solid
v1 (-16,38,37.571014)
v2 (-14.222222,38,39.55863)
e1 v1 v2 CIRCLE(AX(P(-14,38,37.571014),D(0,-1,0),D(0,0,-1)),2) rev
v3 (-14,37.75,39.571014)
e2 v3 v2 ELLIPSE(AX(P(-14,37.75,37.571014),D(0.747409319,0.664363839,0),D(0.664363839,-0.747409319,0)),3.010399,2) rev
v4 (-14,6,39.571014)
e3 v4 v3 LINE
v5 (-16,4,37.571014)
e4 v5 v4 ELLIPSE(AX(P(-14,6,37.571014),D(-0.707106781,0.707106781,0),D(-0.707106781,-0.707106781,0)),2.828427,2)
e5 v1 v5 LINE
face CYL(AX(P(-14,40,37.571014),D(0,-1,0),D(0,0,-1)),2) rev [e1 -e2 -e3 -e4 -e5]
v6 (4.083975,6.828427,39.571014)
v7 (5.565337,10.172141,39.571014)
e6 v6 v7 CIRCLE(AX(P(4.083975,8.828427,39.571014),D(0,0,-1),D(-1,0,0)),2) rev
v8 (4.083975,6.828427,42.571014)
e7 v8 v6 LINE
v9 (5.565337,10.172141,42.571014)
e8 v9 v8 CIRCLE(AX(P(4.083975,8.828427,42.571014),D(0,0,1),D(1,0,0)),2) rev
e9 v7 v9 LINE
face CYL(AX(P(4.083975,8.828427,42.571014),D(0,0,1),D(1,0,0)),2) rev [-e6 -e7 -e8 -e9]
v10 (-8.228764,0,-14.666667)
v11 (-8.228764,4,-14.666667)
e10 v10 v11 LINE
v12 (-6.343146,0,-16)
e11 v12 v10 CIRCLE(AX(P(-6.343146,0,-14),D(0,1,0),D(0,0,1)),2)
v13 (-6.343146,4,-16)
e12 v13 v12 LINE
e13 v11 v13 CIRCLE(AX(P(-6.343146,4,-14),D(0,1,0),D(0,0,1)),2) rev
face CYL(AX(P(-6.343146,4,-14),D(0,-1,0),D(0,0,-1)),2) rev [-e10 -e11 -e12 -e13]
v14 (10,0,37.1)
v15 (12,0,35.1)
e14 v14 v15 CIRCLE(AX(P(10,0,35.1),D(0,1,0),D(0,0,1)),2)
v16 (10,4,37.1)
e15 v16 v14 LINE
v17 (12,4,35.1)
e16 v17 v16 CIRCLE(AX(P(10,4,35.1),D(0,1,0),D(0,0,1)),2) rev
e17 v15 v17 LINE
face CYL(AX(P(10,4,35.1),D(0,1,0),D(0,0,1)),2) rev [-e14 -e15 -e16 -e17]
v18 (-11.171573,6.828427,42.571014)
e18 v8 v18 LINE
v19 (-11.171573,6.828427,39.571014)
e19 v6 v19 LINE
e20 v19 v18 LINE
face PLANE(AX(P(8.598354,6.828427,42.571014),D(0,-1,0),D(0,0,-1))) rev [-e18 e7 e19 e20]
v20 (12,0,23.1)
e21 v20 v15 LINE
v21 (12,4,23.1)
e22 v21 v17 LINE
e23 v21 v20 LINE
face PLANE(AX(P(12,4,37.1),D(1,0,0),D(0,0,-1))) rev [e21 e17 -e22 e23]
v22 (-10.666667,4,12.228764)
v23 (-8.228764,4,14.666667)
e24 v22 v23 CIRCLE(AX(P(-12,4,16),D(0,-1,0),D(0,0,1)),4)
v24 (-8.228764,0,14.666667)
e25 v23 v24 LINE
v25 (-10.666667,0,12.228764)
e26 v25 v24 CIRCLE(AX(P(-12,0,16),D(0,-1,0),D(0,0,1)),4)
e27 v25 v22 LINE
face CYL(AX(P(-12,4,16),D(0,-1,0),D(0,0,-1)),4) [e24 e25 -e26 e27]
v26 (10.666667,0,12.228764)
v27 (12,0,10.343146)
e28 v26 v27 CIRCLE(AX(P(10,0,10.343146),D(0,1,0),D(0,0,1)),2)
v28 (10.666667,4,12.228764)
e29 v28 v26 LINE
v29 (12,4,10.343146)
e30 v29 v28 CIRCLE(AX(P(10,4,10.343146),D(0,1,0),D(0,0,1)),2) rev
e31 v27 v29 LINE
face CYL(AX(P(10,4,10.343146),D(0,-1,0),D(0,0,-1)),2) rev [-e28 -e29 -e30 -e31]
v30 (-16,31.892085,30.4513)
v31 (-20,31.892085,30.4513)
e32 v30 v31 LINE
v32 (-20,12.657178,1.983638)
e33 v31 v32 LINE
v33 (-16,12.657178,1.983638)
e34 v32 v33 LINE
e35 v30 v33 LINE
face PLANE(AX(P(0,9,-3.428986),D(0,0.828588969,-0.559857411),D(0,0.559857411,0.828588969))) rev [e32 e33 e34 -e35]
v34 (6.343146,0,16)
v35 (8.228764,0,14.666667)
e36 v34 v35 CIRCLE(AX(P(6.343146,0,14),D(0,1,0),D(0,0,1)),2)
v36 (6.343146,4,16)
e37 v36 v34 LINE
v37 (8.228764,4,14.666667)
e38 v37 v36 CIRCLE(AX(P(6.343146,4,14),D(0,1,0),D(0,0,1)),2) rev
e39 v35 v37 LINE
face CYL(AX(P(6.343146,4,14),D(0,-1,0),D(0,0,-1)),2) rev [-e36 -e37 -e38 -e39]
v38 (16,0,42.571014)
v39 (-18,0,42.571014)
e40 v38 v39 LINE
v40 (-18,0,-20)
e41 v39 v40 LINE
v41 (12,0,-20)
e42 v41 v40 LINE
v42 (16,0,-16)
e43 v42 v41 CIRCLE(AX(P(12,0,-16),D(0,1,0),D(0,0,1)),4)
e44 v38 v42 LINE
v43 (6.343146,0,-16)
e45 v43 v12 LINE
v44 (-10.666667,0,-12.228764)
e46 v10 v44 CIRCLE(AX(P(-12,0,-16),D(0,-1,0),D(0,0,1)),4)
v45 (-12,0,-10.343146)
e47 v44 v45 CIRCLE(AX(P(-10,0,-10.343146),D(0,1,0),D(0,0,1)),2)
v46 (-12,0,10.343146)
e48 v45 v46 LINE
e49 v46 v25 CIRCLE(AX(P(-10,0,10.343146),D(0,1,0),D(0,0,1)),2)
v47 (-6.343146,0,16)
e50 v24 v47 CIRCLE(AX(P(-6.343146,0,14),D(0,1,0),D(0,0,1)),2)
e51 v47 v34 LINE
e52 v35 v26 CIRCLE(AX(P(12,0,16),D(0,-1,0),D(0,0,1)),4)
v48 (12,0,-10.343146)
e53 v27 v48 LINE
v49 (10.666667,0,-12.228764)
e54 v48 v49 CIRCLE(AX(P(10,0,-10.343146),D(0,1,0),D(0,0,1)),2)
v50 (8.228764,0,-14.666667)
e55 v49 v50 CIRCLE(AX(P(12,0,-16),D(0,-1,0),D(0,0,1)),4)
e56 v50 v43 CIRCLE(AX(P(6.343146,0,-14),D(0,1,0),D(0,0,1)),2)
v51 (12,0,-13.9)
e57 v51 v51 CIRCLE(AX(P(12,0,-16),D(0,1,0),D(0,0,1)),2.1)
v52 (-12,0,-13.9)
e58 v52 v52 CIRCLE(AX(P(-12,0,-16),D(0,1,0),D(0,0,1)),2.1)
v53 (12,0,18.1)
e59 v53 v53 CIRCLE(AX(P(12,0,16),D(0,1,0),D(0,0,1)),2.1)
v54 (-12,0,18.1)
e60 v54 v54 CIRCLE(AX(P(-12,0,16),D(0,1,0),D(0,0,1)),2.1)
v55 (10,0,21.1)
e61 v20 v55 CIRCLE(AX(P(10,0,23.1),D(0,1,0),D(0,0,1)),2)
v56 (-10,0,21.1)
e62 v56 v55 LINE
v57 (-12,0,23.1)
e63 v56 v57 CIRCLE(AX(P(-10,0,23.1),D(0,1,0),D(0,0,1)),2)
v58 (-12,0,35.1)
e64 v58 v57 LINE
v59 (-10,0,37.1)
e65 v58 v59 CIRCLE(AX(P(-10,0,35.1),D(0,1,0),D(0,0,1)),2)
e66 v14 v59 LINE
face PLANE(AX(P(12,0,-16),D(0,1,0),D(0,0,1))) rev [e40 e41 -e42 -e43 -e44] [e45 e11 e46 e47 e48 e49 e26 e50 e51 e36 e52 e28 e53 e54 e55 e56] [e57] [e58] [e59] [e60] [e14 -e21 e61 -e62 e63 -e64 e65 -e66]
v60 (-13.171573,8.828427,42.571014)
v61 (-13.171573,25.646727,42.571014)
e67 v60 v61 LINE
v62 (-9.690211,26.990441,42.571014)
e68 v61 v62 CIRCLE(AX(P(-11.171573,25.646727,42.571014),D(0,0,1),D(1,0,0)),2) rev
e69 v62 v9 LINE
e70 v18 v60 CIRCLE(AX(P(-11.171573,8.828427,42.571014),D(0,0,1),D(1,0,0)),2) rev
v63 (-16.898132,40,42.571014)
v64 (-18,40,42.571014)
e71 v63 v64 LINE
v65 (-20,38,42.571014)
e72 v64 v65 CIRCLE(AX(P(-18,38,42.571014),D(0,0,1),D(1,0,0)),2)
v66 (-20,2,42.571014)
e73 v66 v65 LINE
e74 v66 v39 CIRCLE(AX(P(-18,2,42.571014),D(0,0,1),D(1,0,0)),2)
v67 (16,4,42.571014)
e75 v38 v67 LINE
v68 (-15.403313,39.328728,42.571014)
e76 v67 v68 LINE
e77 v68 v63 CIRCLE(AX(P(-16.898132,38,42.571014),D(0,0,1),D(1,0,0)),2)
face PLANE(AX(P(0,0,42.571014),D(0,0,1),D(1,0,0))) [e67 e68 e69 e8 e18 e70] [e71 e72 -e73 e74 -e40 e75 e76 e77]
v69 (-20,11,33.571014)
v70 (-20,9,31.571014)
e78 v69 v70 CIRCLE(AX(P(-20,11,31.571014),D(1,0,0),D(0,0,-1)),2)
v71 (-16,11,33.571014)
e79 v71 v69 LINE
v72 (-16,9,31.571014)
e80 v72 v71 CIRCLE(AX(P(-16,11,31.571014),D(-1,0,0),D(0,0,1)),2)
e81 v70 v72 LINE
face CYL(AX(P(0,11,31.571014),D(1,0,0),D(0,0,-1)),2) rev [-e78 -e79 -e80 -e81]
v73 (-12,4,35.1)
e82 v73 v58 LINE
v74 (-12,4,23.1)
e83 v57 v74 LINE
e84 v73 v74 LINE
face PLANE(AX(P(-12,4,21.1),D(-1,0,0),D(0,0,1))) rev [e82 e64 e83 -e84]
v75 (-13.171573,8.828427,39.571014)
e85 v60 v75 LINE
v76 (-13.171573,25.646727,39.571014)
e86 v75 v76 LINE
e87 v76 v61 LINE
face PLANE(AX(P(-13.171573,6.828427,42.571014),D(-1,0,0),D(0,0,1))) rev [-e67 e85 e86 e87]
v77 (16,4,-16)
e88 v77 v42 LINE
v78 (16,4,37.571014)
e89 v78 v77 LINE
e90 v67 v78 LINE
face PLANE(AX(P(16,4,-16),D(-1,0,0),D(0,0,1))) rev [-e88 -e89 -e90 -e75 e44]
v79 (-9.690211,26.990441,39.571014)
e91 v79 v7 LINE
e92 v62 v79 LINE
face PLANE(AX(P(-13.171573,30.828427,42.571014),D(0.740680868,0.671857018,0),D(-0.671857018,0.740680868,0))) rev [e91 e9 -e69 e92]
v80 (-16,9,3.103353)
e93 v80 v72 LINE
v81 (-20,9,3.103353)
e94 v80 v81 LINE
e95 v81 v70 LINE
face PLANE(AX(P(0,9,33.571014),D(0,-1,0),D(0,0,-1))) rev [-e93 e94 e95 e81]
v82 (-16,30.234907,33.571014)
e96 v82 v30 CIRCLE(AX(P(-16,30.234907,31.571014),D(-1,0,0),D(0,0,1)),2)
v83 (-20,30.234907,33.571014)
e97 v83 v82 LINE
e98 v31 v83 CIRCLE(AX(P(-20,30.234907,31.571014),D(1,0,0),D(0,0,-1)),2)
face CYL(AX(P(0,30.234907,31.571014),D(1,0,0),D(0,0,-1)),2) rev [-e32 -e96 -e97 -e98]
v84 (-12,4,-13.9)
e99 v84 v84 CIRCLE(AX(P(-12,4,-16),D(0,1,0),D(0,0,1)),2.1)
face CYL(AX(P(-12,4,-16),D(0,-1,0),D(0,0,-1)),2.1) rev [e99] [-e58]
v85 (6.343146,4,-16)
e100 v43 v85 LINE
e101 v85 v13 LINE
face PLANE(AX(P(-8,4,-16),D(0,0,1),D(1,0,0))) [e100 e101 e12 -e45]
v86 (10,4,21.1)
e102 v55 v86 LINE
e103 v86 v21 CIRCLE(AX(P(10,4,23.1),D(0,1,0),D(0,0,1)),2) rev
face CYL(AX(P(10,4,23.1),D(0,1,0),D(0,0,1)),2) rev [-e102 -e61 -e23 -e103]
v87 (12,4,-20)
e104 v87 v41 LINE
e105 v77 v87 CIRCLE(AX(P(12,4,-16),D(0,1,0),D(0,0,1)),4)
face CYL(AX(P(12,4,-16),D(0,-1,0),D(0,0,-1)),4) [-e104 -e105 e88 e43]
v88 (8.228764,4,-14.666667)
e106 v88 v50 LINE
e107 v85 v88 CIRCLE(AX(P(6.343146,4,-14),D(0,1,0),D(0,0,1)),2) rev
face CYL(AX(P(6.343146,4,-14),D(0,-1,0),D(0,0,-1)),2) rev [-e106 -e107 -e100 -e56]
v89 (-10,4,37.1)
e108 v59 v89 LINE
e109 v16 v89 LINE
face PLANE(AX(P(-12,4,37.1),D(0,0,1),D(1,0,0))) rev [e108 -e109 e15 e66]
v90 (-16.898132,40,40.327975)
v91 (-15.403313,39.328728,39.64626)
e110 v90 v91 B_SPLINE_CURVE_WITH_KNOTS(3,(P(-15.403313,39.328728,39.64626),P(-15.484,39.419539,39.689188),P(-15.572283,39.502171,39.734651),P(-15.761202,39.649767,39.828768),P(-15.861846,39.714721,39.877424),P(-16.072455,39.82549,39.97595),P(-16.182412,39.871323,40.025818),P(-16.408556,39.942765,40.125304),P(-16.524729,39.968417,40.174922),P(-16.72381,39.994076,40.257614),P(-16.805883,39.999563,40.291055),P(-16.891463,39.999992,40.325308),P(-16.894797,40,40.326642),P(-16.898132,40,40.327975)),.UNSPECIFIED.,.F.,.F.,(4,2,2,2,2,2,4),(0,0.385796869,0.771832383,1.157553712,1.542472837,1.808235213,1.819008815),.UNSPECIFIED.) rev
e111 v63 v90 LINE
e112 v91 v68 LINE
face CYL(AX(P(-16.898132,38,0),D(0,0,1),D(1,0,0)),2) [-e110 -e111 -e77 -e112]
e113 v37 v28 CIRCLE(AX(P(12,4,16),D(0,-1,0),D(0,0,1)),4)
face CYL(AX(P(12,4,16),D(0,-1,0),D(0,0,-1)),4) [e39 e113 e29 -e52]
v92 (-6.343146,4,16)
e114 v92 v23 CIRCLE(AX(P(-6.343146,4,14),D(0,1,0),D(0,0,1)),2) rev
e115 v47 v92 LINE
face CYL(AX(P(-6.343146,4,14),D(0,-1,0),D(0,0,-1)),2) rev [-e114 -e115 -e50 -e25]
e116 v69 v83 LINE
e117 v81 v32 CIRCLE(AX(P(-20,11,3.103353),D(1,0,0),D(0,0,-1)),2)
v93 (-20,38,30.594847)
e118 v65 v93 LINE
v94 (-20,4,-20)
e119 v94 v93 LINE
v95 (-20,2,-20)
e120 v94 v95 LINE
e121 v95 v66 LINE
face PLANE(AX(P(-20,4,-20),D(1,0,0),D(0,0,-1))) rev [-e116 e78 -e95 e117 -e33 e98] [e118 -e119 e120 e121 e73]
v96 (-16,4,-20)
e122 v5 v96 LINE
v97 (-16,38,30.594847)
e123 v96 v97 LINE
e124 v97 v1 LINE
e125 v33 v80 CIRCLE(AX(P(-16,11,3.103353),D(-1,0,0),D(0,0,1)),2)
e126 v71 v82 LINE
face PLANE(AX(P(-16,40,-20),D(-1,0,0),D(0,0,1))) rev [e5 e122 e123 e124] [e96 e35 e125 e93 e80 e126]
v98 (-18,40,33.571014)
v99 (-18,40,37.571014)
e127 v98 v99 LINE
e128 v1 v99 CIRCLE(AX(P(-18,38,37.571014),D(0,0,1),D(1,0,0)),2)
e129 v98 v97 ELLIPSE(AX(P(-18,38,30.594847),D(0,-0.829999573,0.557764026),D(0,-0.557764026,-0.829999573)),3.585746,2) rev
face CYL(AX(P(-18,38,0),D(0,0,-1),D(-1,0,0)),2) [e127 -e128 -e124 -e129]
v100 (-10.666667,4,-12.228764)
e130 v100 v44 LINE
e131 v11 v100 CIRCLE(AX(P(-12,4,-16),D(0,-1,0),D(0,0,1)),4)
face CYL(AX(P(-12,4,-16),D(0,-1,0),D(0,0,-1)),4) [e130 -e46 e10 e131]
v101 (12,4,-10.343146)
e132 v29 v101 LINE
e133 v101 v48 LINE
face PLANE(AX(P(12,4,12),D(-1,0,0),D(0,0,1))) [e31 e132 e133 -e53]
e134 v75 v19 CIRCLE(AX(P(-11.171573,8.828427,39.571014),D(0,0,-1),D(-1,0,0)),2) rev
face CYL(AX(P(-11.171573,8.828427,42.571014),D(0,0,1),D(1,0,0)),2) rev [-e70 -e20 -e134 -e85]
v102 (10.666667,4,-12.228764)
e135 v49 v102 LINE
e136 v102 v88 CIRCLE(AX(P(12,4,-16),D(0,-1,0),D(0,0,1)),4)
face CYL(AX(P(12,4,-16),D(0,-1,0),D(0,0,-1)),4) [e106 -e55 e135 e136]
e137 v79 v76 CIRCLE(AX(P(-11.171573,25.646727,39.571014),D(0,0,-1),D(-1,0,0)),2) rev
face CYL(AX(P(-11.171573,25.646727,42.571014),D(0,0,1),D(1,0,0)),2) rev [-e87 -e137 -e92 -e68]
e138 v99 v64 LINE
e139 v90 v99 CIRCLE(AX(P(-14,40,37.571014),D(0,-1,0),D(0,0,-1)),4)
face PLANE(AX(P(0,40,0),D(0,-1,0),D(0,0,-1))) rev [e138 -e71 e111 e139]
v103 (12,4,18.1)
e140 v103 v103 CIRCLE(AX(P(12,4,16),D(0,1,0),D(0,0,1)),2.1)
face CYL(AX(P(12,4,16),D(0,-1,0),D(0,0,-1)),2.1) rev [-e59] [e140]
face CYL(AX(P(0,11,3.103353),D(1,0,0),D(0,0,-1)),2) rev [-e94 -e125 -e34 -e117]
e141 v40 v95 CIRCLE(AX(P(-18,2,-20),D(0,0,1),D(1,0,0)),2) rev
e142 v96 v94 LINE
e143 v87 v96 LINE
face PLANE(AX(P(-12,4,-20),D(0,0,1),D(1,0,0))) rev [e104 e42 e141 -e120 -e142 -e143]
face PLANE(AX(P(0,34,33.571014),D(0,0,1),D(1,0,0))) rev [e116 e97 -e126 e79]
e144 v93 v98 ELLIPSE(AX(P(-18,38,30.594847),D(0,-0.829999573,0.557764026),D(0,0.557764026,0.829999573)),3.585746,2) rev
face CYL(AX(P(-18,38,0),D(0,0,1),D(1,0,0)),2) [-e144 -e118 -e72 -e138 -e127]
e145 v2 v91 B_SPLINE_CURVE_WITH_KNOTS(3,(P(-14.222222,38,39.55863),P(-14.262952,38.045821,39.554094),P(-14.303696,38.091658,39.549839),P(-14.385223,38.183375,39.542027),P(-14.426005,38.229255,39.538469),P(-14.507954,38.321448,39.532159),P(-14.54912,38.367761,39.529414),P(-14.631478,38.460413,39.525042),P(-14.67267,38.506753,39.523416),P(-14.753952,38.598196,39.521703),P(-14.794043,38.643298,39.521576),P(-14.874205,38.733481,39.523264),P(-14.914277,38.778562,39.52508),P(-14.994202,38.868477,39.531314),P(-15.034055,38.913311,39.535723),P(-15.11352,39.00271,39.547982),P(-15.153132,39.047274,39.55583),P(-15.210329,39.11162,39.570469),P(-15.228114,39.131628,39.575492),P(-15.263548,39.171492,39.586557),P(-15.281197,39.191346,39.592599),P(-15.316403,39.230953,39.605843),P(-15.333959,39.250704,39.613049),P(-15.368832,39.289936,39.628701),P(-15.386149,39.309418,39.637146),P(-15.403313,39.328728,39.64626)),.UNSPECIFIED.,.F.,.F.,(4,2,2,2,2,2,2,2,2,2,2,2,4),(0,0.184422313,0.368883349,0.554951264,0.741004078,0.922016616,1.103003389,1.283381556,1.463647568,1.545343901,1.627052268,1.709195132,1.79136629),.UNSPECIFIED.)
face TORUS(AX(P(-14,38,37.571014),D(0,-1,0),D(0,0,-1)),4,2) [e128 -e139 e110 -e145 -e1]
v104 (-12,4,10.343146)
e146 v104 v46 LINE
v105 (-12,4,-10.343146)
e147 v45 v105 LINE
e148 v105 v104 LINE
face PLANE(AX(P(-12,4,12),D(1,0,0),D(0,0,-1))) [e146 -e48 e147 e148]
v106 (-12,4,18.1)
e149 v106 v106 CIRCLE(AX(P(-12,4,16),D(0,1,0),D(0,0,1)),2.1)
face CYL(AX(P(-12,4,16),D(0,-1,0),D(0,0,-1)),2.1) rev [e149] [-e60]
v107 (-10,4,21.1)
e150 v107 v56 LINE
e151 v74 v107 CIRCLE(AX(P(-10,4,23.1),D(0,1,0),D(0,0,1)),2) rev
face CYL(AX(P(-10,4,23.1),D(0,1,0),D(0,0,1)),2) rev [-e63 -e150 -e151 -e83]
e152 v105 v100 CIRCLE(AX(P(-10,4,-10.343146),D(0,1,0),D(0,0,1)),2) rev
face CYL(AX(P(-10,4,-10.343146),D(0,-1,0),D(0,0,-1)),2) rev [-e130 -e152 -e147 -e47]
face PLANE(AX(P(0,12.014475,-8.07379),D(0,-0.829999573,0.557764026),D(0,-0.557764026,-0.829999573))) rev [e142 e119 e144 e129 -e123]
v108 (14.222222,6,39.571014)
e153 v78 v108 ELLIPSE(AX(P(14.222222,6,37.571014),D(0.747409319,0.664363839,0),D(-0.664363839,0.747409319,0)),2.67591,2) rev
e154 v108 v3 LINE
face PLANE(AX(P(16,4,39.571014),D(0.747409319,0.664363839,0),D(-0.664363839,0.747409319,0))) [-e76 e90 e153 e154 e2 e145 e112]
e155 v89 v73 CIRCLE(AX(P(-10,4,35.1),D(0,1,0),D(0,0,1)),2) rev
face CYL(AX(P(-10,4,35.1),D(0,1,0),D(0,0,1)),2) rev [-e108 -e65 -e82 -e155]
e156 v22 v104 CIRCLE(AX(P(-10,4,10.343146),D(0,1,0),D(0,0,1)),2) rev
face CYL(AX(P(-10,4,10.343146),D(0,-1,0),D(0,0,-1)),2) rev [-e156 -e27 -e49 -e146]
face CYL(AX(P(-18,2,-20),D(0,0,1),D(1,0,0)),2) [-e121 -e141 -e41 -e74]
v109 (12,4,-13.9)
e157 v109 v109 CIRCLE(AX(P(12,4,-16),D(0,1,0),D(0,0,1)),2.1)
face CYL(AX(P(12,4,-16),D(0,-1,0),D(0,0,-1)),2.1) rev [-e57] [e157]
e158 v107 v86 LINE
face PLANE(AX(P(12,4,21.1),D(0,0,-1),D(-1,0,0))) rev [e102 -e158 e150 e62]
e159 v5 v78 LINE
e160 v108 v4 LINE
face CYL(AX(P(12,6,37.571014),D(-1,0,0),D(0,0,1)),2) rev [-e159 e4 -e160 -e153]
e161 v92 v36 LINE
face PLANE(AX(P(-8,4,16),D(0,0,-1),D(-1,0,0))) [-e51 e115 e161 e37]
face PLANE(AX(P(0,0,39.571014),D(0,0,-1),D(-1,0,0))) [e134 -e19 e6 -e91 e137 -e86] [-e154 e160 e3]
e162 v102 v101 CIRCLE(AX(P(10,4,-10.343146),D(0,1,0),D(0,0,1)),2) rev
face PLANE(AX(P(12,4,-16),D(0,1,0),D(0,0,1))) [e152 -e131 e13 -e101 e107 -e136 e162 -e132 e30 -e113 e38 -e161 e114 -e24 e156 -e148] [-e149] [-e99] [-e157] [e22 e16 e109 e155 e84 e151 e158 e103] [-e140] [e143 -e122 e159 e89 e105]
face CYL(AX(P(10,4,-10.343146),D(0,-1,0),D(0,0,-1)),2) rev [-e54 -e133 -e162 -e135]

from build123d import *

# Parameters (mm, degrees)
SKETCH1_R           = 2.1
BOSS_EXTRUDE1_DEPTH = 4
SKETCH2_W           = 4
SKETCH2_H           = 79.366859707
BOSS_EXTRUDE2_DEPTH = 36
SKETCH3_W           = 16.795845367
SKETCH3_H           = 36
CUT_EXTRUDE1_DEPTH  = 20
SKETCH4_W           = 16
SKETCH4_H           = 4
BOSS_EXTRUDE3_DEPTH = 36
CUT_EXTRUDE2_DEPTH  = 20
BOSS_EXTRUDE4_DEPTH = 3
CUT_EXTRUDE3_DEPTH  = 3
SKETCH9_W           = 24
SKETCH9_H           = 16
CUT_EXTRUDE5_DEPTH  = 4
FILLET1_R           = 2
FILLET2_R           = 2
FILLET3_START       = -20
FILLET3_DEPTH       = 57.57101424
FILLET3_START_2     = 35.417415549
FILLET3_2_DEPTH     = 8.582584451
FILLET3_START_3     = 39
FILLET3_4_DEPTH     = 5


with BuildPart() as part:
    # Sketch1 → Boss-Extrude1 (new body)
    with BuildSketch(Plane(origin=(0, 0, 0), x_dir=(1, 0, 0), z_dir=(0, 1, 0))):
        with BuildLine():
            Line((-12, 20), (12, 20))
            ThreePointArc((12, 20), (14.828427125, 18.828427125), (16, 16))
            Line((16, 16), (16, -16))
            Line((16, -16), (16, -26.57101434))
            Line((16, -26.57101434), (-16, -26.57101434))
            Line((-16, -26.57101434), (-20, -26.57101434))
            Line((-20, -26.57101434), (-20, 20))
            Line((-20, 20), (-12, 20))
        make_face()
        with Locations(Location((-12, 16, 0), (0, 0, 270))):
            Circle(SKETCH1_R, mode=Mode.SUBTRACT)
        with Locations(Location((12, 16, 0), (0, 0, 270))):
            Circle(SKETCH1_R, mode=Mode.SUBTRACT)
        with Locations(Location((12, -16, 0), (0, 0, 270))):
            Circle(SKETCH1_R, mode=Mode.SUBTRACT)
        with Locations(Location((-12, -16, 0), (0, 0, 270))):
            Circle(SKETCH1_R, mode=Mode.SUBTRACT)
        with BuildLine():
            Line((-8, 16), (8, 16))
            ThreePointArc((8, 16), (9.171572875, 13.171572875), (12, 12))
            Line((12, 12), (12, -12))
            ThreePointArc((12, -12), (9.171572875, -13.171572875), (8, -16))
            Line((8, -16), (-8, -16))
            ThreePointArc((-8, -16), (-9.171572875, -13.171572875), (-12, -12))
            Line((-12, -12), (-12, 12))
            ThreePointArc((-12, 12), (-9.171572875, 13.171572875), (-8, 16))
        make_face(mode=Mode.SUBTRACT)
    extrude(amount=BOSS_EXTRUDE1_DEPTH)

    # Sketch2 → Boss-Extrude2 (add)
    with BuildSketch(Plane(origin=(0, 4, 0), x_dir=(1, 0, 0), z_dir=(0, 1, 0))):
        with Locations((-18, -19.683429854)):
            Rectangle(SKETCH2_W, SKETCH2_H)
    extrude(amount=BOSS_EXTRUDE2_DEPTH)

    # Sketch3 → Cut-Extrude1 (cut)
    with BuildSketch(Plane.ZY.offset(20)):
        Polygon((-20, 4), (33.57101434, 40), (-20, 40), align=None)
        with Locations((50.968937024, 22)):
            Rectangle(SKETCH3_W, SKETCH3_H)
    extrude(amount=-CUT_EXTRUDE1_DEPTH, mode=Mode.SUBTRACT)

    # Sketch4 → Boss-Extrude3 (add)
    with BuildSketch(Plane.ZY.offset(20)):
        with Locations((34.57101434, 2)):
            Rectangle(SKETCH4_W, SKETCH4_H)
    extrude(amount=-BOSS_EXTRUDE3_DEPTH)

    # Sketch5 → Cut-Extrude2 (cut)
    with BuildSketch(Plane.ZY.offset(20)):
        Polygon((33.57101434, 34), (33.57101434, 9), (-3.42898566, 9), align=None)
    extrude(amount=-CUT_EXTRUDE2_DEPTH, mode=Mode.SUBTRACT)

    # Sketch6 → Boss-Extrude4 (add)
    with BuildSketch(Plane.XY.offset(42.57101434)):
        Polygon((-16, 40), (-16, 4), (16, 4), align=None)
    extrude(amount=-BOSS_EXTRUDE4_DEPTH)

    # Sketch7 → Cut-Extrude3 (cut)
    with BuildSketch(Plane(origin=(0, 0, 39.57101434), x_dir=(-1, 0, 0), z_dir=(0, 0, -1))):
        Polygon((13.171572875, 6.828427125), (13.171572875, 30.828427125), (-8.598354134, 6.828427125), align=None)
    extrude(amount=-CUT_EXTRUDE3_DEPTH, mode=Mode.SUBTRACT)

    # Sketch9 → Cut-Extrude5 (cut)
    with BuildSketch(Plane.XZ):
        with Locations((0, 29.1)):
            Rectangle(SKETCH9_W, SKETCH9_H)
    extrude(amount=-CUT_EXTRUDE5_DEPTH, mode=Mode.SUBTRACT)

    # Fillet1
    fillet1_edges = [part.edges().sort_by_distance(p)[0] for p in [
        (-18, 9, -3.42898566),
        (-18, 34, 33.57101434),
        (-18, 9, 33.57101434),
        (-13.171572875, 6.828427125, 41.07101434),
        (8.598354134, 6.828427125, 41.07101434),
        (-13.171572875, 30.828427125, 41.07101434),
        (12, 2, 37.1),
        (12, 2, 21.1),
        (-12, 2, 21.1),
        (-12, 2, 37.1),
        (-8, 2, -16),
        (-12, 2, -12),
        (-12, 2, 12),
        (-8, 2, 16),
        (8, 2, 16),
        (12, 2, 12),
        (12, 2, -12),
        (8, 2, -16),
    ]]
    fillet(fillet1_edges, radius=FILLET1_R)

    # Fillet2
    fillet2_edges = [part.edges().sort_by_distance(p)[0] for p in [
        (-20, 0, 11.28550717),
        (0, 4, 39.57101434),
        (-16, 22, 39.57101434),
        (-20, 40, 38.07101434),
    ]]
    fillet(fillet2_edges, radius=FILLET2_R)

    # Fillet3: read off the stored shape, not the designer's step
    # Fillet3 outline → Fillet3 (cut)
    with BuildSketch(Plane.XY.offset(FILLET3_START)):
        with BuildLine():
            ThreePointArc((-18, 40), (-16.585786438, 39.414213562), (-16, 38))
            Line((-16, 38), (-16, 40))
            Line((-16, 40), (-18, 40))
        make_face()
    extrude(amount=FILLET3_DEPTH, mode=Mode.SUBTRACT)

    # Fillet3 2 outline → Fillet3 2 (cut)
    with BuildSketch(Plane.XY.offset(FILLET3_START_2)):
        with BuildLine():
            Line((-16, 40), (-16.898132129, 40))
            ThreePointArc((-16.898132129, 40), (-16.43660977, 39.946020841), (-16, 39.786997113))
            Line((-16, 39.786997113), (-16, 40))
        make_face()
    extrude(amount=FILLET3_2_DEPTH, mode=Mode.SUBTRACT)

    # Fillet3 3 outline → Fillet3 3 (revolve, cut)
    with BuildSketch(Plane(origin=(-14, 0, 37.57101434), x_dir=(1, 0, 0), z_dir=(0, 0, 1))):
        with BuildLine():
            Line((2, 40), (2, 38))
            ThreePointArc((2, 38), (2.585786438, 39.414213562), (4, 40))
            Line((4, 40), (2, 40))
        make_face()
    revolve(axis=Axis((-14, 0, 37.57101434), (0, 1, 0)), mode=Mode.SUBTRACT)

    # Fillet3 4 outline → Fillet3 4 (cut)
    with BuildSketch(Plane.XY.offset(FILLET3_START_3)):
        with BuildLine():
            ThreePointArc((-16, 39.786997113), (-15.679913732, 39.586172734), (-15.403313491, 39.328727678))
            Line((-15.403313491, 39.328727678), (-16, 40))
            Line((-16, 40), (-16, 39.786997113))
        make_face()
    extrude(amount=FILLET3_4_DEPTH, mode=Mode.SUBTRACT)


solid = part.part
